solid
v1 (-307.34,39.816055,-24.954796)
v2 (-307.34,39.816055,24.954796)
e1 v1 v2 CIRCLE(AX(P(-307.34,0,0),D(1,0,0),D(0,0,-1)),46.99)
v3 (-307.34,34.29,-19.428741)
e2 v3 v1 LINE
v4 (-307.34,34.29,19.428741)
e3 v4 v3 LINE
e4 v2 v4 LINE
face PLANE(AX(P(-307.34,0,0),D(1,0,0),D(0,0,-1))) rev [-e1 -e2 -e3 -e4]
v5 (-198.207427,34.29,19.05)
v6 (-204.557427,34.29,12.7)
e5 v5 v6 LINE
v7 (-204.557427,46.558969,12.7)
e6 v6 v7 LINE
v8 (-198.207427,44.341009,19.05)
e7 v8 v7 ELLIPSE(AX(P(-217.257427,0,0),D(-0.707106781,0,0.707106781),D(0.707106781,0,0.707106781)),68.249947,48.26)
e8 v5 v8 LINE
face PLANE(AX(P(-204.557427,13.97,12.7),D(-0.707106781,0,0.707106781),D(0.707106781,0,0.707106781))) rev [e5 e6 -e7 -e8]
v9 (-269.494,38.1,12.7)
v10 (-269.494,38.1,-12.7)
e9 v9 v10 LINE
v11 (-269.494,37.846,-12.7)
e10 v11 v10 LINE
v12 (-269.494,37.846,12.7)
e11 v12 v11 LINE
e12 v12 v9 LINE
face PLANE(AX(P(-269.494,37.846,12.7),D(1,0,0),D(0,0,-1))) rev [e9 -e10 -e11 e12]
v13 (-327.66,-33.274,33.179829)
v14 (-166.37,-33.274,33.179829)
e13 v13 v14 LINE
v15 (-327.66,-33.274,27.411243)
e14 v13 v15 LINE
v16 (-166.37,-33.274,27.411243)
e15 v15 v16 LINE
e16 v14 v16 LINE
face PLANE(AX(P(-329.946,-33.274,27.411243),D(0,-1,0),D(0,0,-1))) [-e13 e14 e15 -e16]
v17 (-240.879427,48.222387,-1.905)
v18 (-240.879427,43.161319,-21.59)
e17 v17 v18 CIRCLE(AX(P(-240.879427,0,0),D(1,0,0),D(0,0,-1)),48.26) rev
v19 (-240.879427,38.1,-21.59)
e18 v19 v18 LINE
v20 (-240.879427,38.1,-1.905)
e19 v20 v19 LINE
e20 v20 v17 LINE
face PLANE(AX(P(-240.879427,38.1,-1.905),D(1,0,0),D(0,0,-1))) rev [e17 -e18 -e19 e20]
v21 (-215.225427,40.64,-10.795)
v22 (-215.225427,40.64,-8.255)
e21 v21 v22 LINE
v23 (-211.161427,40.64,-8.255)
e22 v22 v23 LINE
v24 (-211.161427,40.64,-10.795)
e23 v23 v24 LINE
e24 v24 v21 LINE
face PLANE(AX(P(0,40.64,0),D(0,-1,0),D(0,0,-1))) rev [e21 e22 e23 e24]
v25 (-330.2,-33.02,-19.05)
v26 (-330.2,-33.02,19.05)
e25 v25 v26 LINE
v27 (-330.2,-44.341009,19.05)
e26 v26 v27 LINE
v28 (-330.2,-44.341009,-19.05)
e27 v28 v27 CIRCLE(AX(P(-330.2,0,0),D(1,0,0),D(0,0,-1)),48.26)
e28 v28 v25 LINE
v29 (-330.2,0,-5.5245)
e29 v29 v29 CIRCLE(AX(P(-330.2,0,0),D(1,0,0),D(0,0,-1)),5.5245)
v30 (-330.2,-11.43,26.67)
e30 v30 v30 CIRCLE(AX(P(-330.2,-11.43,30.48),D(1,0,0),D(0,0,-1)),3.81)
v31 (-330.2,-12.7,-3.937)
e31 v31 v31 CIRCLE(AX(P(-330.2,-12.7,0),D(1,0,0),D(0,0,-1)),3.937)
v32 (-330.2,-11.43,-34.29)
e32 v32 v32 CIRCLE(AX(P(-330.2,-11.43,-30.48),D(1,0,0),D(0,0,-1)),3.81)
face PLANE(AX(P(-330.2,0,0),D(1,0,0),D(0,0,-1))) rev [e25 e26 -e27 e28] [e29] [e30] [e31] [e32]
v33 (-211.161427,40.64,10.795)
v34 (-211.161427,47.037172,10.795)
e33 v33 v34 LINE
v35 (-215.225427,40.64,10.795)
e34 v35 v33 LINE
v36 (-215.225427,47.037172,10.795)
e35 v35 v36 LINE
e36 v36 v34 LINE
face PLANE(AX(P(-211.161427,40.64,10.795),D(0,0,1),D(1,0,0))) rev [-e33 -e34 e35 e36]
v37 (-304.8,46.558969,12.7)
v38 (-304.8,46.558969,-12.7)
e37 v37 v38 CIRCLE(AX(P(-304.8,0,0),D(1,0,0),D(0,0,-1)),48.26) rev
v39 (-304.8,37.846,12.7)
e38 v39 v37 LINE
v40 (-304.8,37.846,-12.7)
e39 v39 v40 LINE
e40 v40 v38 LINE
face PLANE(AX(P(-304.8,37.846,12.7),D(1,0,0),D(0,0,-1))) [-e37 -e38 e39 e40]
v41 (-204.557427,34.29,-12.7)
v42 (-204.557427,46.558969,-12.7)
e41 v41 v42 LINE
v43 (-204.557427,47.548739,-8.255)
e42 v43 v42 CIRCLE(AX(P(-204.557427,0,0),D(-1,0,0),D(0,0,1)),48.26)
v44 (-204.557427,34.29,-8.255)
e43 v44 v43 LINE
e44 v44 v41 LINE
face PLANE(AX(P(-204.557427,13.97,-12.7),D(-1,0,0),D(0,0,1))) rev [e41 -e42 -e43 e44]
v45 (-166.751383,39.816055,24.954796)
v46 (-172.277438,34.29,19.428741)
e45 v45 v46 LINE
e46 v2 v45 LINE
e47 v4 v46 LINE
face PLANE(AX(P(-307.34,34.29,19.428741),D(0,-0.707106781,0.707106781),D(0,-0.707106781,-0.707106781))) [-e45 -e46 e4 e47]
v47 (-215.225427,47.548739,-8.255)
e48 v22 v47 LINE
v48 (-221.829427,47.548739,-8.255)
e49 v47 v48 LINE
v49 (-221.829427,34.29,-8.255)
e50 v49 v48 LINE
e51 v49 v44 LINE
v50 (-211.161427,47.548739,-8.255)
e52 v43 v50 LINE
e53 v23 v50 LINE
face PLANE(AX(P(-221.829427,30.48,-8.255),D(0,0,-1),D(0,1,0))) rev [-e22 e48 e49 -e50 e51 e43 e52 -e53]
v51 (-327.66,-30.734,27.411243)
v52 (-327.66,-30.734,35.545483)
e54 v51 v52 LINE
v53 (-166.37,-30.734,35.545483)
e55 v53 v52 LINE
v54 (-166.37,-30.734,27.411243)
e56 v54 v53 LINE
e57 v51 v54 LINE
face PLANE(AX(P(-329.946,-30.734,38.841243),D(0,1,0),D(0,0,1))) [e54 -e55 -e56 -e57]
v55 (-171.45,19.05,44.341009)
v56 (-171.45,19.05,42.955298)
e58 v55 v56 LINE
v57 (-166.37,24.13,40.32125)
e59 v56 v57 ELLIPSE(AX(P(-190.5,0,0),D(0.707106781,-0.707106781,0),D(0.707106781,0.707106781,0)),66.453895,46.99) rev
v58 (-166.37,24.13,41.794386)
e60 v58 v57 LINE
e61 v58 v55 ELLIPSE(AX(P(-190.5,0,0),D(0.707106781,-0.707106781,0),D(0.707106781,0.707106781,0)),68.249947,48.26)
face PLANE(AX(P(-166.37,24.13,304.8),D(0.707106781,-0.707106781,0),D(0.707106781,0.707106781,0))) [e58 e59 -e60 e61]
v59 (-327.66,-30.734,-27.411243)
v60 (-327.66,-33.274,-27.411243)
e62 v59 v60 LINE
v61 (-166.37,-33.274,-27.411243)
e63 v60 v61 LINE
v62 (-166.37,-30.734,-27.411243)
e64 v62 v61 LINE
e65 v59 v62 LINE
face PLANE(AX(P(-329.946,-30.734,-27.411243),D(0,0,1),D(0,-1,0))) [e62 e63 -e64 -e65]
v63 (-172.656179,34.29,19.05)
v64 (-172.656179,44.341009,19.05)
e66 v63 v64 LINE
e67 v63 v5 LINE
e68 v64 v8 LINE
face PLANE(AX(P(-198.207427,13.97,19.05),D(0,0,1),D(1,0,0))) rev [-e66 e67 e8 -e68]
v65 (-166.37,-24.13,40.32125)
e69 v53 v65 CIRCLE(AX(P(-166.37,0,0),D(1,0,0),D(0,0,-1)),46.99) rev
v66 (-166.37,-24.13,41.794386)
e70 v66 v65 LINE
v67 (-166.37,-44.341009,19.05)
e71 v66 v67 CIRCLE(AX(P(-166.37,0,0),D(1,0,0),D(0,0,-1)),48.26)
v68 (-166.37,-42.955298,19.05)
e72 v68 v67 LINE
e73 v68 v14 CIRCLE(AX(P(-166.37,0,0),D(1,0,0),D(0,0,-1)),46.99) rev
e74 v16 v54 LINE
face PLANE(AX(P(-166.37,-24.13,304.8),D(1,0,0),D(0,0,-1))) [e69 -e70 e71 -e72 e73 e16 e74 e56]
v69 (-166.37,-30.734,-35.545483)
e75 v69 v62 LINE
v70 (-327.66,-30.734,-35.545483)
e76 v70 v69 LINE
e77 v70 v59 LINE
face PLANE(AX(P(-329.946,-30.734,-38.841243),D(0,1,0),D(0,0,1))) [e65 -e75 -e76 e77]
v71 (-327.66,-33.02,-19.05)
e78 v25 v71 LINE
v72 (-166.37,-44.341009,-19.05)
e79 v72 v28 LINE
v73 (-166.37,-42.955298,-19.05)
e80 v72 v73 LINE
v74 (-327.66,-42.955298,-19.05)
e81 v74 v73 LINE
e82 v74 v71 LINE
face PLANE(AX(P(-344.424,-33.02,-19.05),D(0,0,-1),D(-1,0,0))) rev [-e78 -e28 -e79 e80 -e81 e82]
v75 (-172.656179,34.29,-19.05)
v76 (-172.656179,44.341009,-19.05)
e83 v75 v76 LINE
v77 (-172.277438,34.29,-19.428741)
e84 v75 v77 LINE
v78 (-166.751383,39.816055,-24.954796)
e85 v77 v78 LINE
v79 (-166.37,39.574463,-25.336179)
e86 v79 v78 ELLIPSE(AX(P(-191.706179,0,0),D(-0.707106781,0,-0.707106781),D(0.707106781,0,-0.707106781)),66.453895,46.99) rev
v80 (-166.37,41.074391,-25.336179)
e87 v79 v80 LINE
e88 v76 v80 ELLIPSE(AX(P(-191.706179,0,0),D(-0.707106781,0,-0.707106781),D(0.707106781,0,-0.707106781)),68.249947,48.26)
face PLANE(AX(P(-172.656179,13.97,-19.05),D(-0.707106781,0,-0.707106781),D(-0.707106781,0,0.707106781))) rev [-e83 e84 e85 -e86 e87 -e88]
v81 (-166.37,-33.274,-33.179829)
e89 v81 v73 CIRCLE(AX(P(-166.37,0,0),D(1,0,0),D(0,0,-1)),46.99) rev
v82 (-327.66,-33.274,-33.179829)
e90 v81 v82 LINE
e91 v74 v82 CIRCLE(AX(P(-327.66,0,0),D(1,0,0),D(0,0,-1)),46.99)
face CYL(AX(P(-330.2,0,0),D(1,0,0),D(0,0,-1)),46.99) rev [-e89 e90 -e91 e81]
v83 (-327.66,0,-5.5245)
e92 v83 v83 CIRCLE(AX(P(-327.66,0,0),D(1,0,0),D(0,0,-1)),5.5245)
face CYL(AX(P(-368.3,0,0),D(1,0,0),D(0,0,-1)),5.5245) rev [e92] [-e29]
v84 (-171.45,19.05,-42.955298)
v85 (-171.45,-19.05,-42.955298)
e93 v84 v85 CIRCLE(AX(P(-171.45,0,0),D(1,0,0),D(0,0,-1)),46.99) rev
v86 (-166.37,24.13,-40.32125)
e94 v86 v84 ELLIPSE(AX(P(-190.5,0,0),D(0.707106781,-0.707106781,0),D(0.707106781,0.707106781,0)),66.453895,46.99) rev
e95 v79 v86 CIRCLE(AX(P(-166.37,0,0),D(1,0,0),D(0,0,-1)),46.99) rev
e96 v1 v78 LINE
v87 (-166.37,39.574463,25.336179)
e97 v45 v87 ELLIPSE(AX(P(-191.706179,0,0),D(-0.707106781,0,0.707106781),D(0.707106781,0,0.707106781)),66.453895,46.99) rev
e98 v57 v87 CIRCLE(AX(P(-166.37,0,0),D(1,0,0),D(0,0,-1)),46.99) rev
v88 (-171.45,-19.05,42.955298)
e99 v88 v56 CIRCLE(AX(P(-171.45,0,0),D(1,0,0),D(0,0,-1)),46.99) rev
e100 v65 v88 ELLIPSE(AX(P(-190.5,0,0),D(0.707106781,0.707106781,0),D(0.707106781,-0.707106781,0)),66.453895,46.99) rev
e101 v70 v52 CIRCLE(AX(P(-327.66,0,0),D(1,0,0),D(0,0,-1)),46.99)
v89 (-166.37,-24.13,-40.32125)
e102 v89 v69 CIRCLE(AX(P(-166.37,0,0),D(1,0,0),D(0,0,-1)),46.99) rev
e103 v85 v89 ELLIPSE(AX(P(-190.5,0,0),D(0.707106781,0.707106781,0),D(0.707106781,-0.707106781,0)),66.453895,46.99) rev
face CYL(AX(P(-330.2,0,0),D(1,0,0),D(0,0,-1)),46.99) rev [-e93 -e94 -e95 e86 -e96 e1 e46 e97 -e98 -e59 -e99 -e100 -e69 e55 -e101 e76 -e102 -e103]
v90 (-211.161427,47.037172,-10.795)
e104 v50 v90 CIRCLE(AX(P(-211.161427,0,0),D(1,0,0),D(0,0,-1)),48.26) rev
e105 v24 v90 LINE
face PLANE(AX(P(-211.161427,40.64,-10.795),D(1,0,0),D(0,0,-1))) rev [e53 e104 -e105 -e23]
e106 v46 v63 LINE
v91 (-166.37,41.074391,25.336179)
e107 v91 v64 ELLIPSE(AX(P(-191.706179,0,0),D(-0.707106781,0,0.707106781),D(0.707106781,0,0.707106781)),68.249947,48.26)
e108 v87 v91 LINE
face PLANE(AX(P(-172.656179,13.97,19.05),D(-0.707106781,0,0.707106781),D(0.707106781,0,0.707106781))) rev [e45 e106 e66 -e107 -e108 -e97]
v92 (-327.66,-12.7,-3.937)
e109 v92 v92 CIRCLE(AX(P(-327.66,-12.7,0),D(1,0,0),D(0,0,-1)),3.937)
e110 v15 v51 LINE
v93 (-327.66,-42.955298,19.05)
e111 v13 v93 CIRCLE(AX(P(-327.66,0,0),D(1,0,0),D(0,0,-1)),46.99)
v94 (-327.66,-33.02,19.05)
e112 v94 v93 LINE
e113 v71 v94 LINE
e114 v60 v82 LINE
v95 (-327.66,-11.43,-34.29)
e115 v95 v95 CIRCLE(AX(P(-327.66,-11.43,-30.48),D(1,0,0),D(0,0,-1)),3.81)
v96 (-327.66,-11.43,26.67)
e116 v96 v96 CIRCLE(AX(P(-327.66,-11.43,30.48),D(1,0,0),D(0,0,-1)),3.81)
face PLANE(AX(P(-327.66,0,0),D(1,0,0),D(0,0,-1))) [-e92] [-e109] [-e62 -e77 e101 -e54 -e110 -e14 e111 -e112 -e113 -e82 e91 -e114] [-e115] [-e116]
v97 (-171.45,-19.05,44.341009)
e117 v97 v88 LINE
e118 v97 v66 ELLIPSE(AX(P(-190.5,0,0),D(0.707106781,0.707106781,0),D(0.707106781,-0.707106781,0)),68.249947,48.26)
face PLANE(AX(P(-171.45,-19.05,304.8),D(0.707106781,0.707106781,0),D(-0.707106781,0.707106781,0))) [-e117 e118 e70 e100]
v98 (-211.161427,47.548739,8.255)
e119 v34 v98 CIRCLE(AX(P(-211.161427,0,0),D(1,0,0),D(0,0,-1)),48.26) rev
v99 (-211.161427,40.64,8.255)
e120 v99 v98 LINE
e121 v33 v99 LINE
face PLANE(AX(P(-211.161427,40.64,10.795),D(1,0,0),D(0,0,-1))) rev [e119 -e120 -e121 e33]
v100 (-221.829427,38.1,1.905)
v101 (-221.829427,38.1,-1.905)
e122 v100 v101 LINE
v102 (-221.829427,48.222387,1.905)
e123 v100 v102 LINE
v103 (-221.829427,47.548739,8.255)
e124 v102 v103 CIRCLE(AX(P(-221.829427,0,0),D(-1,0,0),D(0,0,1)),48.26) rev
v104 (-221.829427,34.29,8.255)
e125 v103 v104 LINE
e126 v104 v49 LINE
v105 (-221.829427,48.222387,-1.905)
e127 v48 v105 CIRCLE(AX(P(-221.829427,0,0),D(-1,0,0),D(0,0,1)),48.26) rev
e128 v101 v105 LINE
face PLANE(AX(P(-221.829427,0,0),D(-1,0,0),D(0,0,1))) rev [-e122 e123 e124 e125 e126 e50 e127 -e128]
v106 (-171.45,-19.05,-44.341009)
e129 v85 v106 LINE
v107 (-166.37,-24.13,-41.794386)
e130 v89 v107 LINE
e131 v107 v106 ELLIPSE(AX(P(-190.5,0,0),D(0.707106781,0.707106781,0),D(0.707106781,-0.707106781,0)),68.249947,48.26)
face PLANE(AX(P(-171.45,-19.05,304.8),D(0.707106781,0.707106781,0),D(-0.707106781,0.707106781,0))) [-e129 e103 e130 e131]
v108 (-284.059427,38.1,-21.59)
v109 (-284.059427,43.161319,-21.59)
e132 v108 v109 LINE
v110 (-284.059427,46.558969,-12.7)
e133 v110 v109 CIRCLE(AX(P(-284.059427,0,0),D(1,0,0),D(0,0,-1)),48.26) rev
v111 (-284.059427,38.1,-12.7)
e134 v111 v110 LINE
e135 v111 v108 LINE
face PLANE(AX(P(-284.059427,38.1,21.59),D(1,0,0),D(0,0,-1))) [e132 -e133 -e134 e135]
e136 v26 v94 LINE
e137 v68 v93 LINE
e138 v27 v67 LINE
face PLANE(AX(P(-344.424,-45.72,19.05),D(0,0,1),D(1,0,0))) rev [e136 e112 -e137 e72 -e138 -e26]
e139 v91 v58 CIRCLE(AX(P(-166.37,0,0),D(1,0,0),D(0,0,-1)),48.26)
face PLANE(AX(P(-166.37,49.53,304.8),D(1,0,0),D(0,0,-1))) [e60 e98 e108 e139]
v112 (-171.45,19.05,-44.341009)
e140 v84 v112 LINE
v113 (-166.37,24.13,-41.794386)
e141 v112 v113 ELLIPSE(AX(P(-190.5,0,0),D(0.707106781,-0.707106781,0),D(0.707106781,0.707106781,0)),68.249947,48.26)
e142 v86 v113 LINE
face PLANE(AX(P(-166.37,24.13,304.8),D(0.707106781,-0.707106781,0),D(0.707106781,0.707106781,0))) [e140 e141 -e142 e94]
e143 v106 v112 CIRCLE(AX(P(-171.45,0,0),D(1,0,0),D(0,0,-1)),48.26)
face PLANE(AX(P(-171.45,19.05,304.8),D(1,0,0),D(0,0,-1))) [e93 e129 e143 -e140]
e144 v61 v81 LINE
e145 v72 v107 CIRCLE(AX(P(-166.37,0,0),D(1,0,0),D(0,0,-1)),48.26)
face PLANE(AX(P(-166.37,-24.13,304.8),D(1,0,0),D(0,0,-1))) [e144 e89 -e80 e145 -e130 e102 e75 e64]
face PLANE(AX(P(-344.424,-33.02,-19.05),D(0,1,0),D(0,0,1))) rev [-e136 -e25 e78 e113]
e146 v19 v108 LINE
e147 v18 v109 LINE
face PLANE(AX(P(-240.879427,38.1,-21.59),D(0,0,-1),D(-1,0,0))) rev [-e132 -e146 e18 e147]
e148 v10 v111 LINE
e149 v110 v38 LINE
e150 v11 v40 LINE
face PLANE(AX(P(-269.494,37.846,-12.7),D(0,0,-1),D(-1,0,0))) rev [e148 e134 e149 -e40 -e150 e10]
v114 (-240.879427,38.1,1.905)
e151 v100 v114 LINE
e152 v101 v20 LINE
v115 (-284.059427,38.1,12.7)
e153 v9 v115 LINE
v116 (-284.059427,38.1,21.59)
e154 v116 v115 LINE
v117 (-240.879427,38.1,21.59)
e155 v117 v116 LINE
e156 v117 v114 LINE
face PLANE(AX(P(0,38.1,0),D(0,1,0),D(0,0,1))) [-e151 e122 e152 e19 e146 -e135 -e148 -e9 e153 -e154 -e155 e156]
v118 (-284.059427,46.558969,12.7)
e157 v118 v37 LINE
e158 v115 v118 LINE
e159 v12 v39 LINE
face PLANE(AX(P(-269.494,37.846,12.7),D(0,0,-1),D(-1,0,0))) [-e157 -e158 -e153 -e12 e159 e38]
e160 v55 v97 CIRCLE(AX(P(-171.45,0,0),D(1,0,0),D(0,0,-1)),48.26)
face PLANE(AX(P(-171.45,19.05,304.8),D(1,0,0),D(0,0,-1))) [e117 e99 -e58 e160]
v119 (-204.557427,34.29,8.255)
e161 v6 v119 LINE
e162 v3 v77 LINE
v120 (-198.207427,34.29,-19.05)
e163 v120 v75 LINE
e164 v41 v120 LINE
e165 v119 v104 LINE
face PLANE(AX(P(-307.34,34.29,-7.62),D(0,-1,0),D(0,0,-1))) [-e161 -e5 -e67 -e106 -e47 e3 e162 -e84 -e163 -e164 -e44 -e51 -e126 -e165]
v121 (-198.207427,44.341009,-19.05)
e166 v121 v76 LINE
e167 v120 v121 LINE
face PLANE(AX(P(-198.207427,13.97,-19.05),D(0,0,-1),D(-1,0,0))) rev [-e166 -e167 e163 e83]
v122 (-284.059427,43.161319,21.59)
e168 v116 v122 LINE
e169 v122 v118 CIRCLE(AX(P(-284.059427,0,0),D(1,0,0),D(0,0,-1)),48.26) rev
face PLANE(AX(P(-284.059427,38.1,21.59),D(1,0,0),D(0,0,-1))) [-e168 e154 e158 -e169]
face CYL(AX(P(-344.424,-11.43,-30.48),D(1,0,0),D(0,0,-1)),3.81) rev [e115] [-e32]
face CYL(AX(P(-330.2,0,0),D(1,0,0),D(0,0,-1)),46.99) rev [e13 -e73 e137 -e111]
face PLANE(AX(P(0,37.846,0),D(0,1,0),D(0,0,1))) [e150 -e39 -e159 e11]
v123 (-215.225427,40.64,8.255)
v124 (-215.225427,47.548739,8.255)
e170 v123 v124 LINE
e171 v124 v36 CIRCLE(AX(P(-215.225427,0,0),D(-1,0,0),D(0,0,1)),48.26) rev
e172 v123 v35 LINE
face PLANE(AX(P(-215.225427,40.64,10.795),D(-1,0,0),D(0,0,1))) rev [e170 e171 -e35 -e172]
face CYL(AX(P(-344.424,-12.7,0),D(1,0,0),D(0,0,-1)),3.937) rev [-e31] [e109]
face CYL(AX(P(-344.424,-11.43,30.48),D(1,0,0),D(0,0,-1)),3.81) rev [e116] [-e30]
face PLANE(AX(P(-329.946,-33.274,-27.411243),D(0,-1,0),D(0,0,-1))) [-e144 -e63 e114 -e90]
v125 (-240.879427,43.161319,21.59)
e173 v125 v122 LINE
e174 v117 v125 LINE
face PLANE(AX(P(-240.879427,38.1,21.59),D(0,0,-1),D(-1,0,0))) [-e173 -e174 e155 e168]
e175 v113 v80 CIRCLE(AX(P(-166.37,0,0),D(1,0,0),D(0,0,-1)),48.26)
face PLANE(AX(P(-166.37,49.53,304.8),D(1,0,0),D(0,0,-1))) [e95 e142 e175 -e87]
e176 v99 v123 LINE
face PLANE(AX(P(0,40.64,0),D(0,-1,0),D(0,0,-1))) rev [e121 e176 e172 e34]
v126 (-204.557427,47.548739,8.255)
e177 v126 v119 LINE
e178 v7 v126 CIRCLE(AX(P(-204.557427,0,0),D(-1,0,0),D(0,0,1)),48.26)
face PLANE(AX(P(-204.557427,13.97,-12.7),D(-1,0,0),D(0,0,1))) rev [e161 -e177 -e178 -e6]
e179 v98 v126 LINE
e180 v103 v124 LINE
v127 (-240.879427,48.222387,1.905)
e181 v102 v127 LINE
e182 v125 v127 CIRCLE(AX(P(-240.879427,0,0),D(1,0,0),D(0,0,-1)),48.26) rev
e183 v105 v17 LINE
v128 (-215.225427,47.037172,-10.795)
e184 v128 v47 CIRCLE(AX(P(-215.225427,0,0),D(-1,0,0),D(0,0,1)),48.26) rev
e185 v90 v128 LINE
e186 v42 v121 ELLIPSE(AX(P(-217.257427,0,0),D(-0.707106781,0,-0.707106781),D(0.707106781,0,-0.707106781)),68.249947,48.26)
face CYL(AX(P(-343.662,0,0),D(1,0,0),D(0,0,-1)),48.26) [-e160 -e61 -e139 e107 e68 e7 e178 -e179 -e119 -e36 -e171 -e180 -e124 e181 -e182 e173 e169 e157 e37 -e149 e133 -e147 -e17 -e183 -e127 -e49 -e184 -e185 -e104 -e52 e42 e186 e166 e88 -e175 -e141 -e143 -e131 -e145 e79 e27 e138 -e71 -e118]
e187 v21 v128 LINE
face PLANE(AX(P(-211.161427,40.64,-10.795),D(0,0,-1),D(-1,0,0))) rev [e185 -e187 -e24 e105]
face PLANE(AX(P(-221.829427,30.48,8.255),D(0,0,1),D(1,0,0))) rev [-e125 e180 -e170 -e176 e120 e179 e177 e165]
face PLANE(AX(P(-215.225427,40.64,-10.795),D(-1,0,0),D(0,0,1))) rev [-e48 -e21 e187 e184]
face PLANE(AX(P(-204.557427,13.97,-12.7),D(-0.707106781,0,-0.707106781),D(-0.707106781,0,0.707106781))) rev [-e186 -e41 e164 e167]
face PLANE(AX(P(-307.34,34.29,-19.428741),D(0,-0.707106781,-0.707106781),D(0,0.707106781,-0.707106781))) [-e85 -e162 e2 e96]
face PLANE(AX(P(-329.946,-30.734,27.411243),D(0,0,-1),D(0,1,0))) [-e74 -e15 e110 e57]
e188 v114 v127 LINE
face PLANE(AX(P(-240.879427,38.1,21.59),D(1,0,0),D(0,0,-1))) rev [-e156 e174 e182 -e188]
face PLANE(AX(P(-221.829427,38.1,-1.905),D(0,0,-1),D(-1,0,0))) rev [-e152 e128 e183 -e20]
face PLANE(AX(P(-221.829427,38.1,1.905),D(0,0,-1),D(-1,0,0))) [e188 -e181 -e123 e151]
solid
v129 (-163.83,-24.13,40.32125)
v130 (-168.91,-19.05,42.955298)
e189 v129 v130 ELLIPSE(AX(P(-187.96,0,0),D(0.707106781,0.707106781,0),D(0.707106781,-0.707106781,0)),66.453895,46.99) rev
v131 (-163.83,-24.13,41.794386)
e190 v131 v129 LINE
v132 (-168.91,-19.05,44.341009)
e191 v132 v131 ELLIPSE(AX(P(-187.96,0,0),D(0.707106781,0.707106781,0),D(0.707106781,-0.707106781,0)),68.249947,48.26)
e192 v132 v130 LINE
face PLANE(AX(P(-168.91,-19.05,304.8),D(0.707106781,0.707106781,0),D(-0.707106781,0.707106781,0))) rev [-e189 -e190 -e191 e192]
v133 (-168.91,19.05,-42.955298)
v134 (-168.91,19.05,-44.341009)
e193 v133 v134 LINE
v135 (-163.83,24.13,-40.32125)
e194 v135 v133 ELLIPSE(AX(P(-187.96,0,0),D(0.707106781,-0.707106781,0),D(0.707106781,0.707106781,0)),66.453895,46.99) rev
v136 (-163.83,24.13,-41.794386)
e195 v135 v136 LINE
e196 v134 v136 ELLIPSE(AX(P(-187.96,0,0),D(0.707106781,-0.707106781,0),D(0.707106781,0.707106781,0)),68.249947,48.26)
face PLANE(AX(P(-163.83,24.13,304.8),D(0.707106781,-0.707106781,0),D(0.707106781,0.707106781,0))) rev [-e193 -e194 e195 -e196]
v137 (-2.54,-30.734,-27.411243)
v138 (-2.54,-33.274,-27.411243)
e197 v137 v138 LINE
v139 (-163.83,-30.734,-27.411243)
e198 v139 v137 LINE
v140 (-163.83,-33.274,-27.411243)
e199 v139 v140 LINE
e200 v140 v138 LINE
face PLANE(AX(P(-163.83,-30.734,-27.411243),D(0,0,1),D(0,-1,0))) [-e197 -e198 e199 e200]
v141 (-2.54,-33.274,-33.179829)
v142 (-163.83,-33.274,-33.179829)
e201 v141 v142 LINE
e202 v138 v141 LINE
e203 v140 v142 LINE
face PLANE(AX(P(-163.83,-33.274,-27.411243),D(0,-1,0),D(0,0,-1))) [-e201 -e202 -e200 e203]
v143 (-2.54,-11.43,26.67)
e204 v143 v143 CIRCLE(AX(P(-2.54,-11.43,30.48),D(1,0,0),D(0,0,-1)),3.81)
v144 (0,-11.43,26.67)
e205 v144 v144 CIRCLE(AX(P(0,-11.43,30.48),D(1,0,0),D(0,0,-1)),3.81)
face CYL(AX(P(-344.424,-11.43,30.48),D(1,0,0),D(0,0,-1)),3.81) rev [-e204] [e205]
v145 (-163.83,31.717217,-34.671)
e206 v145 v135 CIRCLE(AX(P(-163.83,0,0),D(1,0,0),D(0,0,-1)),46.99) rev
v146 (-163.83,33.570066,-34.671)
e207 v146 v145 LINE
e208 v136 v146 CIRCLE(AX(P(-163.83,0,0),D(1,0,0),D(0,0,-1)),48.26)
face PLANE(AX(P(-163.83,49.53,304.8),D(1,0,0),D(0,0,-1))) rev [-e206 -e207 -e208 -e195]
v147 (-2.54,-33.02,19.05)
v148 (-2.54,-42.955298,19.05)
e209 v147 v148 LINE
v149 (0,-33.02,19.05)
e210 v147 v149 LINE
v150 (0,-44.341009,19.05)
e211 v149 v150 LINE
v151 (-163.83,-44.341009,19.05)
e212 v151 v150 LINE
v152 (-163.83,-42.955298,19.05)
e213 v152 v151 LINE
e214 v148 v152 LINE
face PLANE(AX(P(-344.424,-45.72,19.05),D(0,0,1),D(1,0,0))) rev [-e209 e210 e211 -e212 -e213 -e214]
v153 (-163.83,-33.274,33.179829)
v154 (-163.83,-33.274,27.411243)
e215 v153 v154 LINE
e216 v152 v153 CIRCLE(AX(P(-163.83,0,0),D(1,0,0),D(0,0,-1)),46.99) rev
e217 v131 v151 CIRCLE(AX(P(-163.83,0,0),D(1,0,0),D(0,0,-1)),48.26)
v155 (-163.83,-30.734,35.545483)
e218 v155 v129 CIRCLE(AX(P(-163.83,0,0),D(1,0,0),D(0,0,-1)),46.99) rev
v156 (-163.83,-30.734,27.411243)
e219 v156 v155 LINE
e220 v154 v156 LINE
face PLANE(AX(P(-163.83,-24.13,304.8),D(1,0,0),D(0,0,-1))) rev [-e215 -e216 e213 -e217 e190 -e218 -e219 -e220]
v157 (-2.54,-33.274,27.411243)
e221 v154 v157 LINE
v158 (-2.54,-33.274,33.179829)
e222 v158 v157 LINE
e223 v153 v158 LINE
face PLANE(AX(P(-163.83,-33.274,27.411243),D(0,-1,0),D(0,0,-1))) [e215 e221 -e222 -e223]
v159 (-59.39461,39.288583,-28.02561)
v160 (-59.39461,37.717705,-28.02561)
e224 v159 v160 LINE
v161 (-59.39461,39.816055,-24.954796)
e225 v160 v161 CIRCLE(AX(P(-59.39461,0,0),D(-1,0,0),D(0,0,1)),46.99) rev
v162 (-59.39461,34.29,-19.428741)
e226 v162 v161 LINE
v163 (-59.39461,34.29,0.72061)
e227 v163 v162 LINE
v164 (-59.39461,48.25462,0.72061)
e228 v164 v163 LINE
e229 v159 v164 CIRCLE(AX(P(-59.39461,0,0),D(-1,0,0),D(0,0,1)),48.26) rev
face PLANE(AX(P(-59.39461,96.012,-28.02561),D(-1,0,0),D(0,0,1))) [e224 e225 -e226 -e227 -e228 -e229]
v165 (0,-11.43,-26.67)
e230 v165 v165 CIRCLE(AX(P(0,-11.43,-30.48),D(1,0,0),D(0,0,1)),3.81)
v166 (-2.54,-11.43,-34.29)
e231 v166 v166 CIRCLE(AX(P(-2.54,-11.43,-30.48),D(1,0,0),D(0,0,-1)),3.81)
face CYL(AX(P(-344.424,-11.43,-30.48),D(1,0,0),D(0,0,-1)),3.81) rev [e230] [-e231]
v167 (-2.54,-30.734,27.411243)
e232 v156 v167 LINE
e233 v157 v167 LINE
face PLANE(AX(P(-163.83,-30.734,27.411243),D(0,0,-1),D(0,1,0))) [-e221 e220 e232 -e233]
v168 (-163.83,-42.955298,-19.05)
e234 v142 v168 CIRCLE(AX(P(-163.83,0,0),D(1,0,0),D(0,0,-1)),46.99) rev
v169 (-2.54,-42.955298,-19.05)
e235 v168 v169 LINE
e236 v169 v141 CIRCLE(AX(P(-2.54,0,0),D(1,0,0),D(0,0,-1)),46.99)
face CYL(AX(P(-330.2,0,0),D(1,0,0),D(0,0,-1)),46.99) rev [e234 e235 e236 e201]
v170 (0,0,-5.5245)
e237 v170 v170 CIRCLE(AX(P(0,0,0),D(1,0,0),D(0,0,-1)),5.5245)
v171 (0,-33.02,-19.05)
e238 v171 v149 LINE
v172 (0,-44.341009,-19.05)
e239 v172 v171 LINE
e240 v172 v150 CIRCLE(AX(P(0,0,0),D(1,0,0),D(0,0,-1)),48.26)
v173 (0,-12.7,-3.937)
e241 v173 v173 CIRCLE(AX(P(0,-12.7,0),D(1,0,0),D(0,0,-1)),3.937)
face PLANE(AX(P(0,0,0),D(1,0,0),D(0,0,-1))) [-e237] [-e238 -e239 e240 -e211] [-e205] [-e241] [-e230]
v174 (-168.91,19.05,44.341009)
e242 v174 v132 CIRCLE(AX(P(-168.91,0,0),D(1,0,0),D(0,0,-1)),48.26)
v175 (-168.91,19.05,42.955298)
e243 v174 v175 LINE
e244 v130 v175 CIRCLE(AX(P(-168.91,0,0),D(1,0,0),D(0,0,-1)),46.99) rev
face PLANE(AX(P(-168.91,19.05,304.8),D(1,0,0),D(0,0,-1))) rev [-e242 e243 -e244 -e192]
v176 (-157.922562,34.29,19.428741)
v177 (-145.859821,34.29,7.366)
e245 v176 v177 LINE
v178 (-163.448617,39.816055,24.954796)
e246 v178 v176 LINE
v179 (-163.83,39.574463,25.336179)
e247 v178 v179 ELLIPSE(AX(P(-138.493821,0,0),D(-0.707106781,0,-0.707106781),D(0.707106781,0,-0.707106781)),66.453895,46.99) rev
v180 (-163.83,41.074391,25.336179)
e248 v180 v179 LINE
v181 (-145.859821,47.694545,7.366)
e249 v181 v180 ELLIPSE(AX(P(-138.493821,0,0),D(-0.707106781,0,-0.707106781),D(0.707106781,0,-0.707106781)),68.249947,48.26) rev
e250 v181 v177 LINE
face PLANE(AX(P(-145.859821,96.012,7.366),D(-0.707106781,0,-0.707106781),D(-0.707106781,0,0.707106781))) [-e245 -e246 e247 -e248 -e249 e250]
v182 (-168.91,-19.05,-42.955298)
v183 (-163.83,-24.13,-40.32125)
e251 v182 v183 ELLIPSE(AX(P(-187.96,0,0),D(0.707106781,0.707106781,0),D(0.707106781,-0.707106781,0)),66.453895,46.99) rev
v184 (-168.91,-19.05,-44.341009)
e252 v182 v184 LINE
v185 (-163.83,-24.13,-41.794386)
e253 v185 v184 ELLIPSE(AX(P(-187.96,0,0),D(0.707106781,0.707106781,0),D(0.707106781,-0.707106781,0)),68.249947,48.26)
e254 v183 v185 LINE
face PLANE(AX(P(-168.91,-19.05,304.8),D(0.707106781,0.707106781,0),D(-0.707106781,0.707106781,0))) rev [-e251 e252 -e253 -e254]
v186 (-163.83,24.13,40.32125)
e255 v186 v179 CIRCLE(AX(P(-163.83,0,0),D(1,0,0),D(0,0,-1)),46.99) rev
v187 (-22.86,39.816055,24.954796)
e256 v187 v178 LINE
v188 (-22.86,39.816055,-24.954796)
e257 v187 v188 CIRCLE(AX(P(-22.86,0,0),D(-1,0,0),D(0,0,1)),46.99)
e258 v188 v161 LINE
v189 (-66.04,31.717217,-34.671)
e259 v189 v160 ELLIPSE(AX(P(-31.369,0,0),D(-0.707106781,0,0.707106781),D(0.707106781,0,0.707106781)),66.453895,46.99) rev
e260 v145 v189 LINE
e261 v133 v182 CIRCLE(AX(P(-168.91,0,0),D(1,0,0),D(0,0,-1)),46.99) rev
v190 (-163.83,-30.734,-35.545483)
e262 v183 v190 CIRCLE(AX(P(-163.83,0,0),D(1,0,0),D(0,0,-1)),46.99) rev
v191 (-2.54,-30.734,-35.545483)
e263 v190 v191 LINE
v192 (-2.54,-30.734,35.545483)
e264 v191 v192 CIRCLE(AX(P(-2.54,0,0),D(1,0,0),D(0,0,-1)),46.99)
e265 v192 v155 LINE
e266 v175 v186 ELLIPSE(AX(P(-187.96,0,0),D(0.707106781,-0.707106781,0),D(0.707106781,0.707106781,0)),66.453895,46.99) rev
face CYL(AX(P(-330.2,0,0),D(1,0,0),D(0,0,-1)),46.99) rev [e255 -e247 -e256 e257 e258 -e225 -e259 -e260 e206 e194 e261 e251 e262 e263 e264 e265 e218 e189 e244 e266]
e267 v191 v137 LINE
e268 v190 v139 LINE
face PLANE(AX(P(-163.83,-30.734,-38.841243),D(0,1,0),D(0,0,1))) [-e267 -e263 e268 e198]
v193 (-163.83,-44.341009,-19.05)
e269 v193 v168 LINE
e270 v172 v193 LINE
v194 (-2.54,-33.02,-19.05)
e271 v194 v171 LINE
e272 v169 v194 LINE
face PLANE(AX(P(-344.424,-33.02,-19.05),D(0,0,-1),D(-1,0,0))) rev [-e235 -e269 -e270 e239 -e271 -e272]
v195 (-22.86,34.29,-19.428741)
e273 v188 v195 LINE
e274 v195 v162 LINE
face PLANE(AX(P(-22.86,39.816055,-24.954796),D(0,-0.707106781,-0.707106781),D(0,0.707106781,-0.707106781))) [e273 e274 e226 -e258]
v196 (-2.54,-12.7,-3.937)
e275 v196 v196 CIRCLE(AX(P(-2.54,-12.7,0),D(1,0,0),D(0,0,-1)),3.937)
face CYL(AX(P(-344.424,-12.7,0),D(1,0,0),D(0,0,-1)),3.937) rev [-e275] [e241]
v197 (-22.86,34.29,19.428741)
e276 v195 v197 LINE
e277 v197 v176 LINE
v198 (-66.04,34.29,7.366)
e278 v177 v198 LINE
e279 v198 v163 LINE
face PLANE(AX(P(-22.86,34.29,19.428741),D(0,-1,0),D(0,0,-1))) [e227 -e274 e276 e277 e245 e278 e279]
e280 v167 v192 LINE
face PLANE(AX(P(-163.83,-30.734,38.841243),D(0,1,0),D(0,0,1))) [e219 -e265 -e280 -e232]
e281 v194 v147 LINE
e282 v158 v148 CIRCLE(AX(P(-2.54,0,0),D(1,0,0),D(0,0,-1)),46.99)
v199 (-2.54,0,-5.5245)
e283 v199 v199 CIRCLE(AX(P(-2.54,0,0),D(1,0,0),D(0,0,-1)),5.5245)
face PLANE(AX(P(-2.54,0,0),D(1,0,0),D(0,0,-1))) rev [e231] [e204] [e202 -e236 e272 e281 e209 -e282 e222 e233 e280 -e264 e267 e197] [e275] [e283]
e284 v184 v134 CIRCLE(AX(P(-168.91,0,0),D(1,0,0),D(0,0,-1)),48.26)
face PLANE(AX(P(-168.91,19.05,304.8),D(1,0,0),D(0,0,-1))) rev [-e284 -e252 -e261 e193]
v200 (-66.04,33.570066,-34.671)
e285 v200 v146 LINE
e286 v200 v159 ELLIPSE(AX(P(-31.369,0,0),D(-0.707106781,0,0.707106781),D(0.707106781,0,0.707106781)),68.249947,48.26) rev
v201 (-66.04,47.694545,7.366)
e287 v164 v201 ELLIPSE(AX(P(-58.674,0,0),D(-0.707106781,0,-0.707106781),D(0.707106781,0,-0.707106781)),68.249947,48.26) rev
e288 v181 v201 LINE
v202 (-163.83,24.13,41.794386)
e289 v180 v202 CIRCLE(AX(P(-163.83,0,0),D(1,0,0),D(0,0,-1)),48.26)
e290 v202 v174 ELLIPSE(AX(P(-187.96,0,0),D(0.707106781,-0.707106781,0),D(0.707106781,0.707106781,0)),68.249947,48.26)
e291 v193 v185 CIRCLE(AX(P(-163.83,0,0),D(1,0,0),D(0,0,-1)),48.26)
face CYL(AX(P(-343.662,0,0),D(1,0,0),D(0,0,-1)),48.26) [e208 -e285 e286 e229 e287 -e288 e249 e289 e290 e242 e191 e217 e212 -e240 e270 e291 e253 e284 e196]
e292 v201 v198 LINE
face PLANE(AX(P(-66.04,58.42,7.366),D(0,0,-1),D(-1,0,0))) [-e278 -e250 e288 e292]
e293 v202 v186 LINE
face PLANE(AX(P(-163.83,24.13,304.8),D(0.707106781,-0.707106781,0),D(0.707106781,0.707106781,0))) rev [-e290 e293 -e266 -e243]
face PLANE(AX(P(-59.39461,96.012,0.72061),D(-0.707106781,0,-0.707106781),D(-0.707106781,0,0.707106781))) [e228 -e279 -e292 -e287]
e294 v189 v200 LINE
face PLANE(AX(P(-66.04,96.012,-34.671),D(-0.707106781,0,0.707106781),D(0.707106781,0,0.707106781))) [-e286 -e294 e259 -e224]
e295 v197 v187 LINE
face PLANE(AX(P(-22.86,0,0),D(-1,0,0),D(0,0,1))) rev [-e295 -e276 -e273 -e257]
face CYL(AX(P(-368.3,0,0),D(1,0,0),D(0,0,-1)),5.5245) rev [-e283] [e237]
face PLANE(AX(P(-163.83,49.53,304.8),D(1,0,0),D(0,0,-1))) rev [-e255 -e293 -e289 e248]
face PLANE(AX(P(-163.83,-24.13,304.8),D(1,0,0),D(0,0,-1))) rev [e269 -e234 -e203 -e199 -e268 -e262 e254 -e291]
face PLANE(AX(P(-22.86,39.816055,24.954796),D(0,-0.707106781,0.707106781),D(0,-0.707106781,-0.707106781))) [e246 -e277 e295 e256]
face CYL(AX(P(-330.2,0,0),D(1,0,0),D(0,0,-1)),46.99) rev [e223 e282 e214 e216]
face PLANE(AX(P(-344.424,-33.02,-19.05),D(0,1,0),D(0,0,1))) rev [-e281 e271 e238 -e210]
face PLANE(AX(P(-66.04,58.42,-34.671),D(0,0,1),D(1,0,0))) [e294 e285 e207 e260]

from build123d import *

# Parameters (mm, degrees)
SKETCH1_R                   = 49.53
CAN_BODY_DEPTH              = 330.2
SEPARATION_DEPTH            = 304.8
SEPARATION_DEPTH_BACK       = 304.8
SHELL1_START                = -327.66
SHELL1_OUTLINE_R            = 46.99
SHELL1_DEPTH                = 161.29
SHELL2_START                = -168.91
SHELL2_OUTLINE_R            = 46.99
SHELL2_DEPTH                = 166.37
SKETCH3_R                   = 3.81
SKETCH3_R_2                 = 3.937
CORD_AND_ROD_CUTS_DEPTH     = 344.424
BOTTOM_RETENTION_RAIL_DEPTH = 140.97
POWER_SWITCH_SLOT_DEPTH     = 35.56
TOP_RETENTION_RIDGE_DEPTH   = 140.97
SKETCH9_R                   = 5.5245
CENTER_HOLE_DEPTH           = 368.3
TOP_GUIDE_RAIL_DEPTH        = 163.83
BOTTOM_START                = -166.37
BOTTOM_GUIDE_RAIL_DEPTH     = 163.576
GOPRO_SLOT_DEPTH            = 2.54
GOPRO_SLOT_DEPTH_BACK       = 96.012
GOPRO_SLOT_START            = -68.58
SKETCH14_W                  = 42.037
SKETCH14_H                  = 58.42
SKETCH13_W                  = 132.445406608
SKETCH13_H                  = 121.677106584
SKETCH13_R                  = 48.26
TOLERANCE_ADJUST_DEPTH      = 343.662
GOPRO_SLOT_CORNERS_DEPTH    = 96.012
SKETCH18_W                  = 16.51
SKETCH18_H                  = 25.4
RUNCAM_CAMERA_CUTOUT_DEPTH  = 17.272
SKETCH19_W                  = 4.064
SKETCH19_H                  = 2.54
CUT_EXTRUDE1_DEPTH          = 7.62
CUT_EXTRUDE2_DEPTH          = 10.16
SKETCH21_W                  = 35.306
SKETCH21_H                  = 25.4
CUT_EXTRUDE3_DEPTH          = 10.414


# Read off the part's stored shape, not the designer's step: Shell1, Shell2
with BuildPart() as part:
    # Sketch1 → Can Body (new body)
    with BuildSketch(Plane(origin=(0, 0, 0), x_dir=(0, 0, -1), z_dir=(1, 0, 0))):
        Circle(SKETCH1_R)
    extrude(amount=-CAN_BODY_DEPTH)

    # Sketch2 → Separation (cut, two sides: drawn at the far end of the back side and taken through both)
    with BuildSketch(Plane.XY.offset(-SEPARATION_DEPTH_BACK)):
        Polygon((-168.91, 19.05), (-168.91, -19.05), (-163.83, -24.13), (-163.83, -49.53), (-166.37, -49.53), (-166.37, -24.13), (-171.45, -19.05), (-171.45, 19.05), (-166.37, 24.13), (-166.37, 49.53), (-163.83, 49.53), (-163.83, 24.13), align=None)
    extrude(amount=SEPARATION_DEPTH + SEPARATION_DEPTH_BACK, mode=Mode.SUBTRACT)


with BuildPart() as separation_piece_1:
    # of the separate pieces the step leaves, piece 1, a body of its own (separation_pieces)
    add(part.part.solids().sort_by_distance((0, 0, -49.53))[0])

    # Shell2 outline → Shell2 (cut)
    with BuildSketch(Plane.YZ.offset(SHELL2_START)):
        Circle(SHELL2_OUTLINE_R)
    extrude(amount=SHELL2_DEPTH, mode=Mode.SUBTRACT)


with BuildPart() as separation_piece_2:
    # of the separate pieces the step leaves, piece 2, a body of its own (separation_pieces)
    add(part.part.solids().sort_by_distance((-171.45, 0, -49.53))[0])

    # Shell1 outline → Shell1 (cut)
    with BuildSketch(Plane.YZ.offset(SHELL1_START)):
        Circle(SHELL1_OUTLINE_R)
    extrude(amount=SHELL1_DEPTH, mode=Mode.SUBTRACT)


with BuildPart() as cord_and_rod_cuts_tool:
    # Sketch3 → Cord and rod cuts (new body)
    with BuildSketch(Plane(origin=(0, 0, 0), x_dir=(0, 0, -1), z_dir=(1, 0, 0))):
        with Locations((-30.48, -11.43)):
            Circle(SKETCH3_R)
        with Locations((30.48, -11.43)):
            Circle(SKETCH3_R)
        with Locations((0, -12.7)):
            Circle(SKETCH3_R_2)
        Polygon((19.05, -33.02), (-19.05, -33.02), (-19.05, -45.72), (-19.05, -57.214809543), (19.05, -57.214809543), (19.05, -45.72), align=None)
    extrude(amount=-CORD_AND_ROD_CUTS_DEPTH)


with BuildPart() as separation_piece_1_1:
    add(separation_piece_1.part)

    # Cord and rod cuts: cut by cord_and_rod_cuts_tool
    add(cord_and_rod_cuts_tool.part, mode=Mode.SUBTRACT)

    # Sketch7 → Top Retention Ridge (add)
    with BuildSketch(Plane.ZY.offset(163.83)):
        with BuildLine():
            Line((19.428741027, 34.29), (-19.428741027, 34.29))
            Line((-19.428741027, 34.29), (-24.954796178, 39.81605515))
            ThreePointArc((-24.954796178, 39.81605515), (0, 46.99), (24.954796178, 39.81605515))
            Line((24.954796178, 39.81605515), (19.428741027, 34.29))
        make_face()
    extrude(amount=-TOP_RETENTION_RIDGE_DEPTH)


with BuildPart() as separation_piece_2_1:
    add(separation_piece_2.part)

    # Cord and rod cuts: cut by cord_and_rod_cuts_tool
    add(cord_and_rod_cuts_tool.part, mode=Mode.SUBTRACT)

    # Sketch4 → Bottom Retention Rail (add)
    with BuildSketch(Plane(origin=(-166.37, 0, 0), x_dir=(0, 0, -1), z_dir=(1, 0, 0))):
        with BuildLine():
            Line((-7.62, 34.29), (-19.428741027, 34.29))
            Line((-19.428741027, 34.29), (-24.954796178, 39.81605515))
            ThreePointArc((-24.954796178, 39.81605515), (0, 46.99), (24.954796178, 39.81605515))
            Line((24.954796178, 39.81605515), (19.428741027, 34.29))
            Line((19.428741027, 34.29), (7.62, 34.29))
            Line((7.62, 34.29), (-7.62, 34.29))
        make_face()
    extrude(amount=-BOTTOM_RETENTION_RAIL_DEPTH)

    # Sketch5 → Power Switch Slot (cut)
    with BuildSketch(Plane(origin=(0, 49.53, 0), x_dir=(1, 0, 0), z_dir=(0, 1, 0))):
        Polygon((-204.557426539, 12.7), (-204.557426539, -12.7), (-198.207426539, -19.05), (-172.656179285, -19.05), (-166.37, -25.336179285), (-166.37, 25.336179285), (-172.656179285, 19.05), (-198.207426539, 19.05), align=None)
    extrude(amount=-POWER_SWITCH_SLOT_DEPTH, mode=Mode.SUBTRACT)


with BuildPart() as center_hole_tool:
    # Sketch9 → Center Hole (new body)
    with BuildSketch(Plane(origin=(0, 0, 0), x_dir=(0, 0, -1), z_dir=(1, 0, 0))):
        Circle(SKETCH9_R)
    extrude(amount=-CENTER_HOLE_DEPTH)


with BuildPart() as separation_piece_1_2:
    add(separation_piece_1_1.part)

    # Center Hole: cut by center_hole_tool
    add(center_hole_tool.part, mode=Mode.SUBTRACT)

    # Sketch10 → Top Guide Rail (add)
    with BuildSketch(Plane(origin=(0, 0, 0), x_dir=(0, 0, -1), z_dir=(1, 0, 0))):
        Polygon((-38.841242823, -30.734), (-27.411242823, -30.734), (-27.411242823, -33.274), (-36.688715213, -33.274), (-37.233551179, -31.620508339), align=None)
        Polygon((37.233551179, -31.620508339), (38.841242823, -30.734), (27.411242823, -30.734), (27.411242823, -33.274), (36.688715213, -33.274), align=None)
    extrude(amount=-TOP_GUIDE_RAIL_DEPTH)

    # Sketch14 → GoPro Slot (cut, two sides: drawn at the far end of the back side and taken through both)
    with BuildSketch(Plane(origin=(0, 0, 0), x_dir=(0, 0, -1), z_dir=(1, 0, 0)).offset(GOPRO_SLOT_START - GOPRO_SLOT_DEPTH_BACK)):
        with Locations((13.6525, 29.21)):
            Rectangle(SKETCH14_W, SKETCH14_H)
    extrude(amount=GOPRO_SLOT_DEPTH + GOPRO_SLOT_DEPTH_BACK, mode=Mode.SUBTRACT)


with BuildPart() as separation_piece_2_2:
    add(separation_piece_2_1.part)

    # Center Hole: cut by center_hole_tool
    add(center_hole_tool.part, mode=Mode.SUBTRACT)

    # Sketch10<2> → Bottom Guide Rail (add)
    with BuildSketch(Plane(origin=(0, 0, 0), x_dir=(0, 0, -1), z_dir=(1, 0, 0)).offset(BOTTOM_START)):
        Polygon((-38.841242823, -30.734), (-27.411242823, -30.734), (-27.411242823, -33.274), (-36.688715213, -33.274), (-37.233551179, -31.620508339), align=None)
        Polygon((37.233551179, -31.620508339), (38.841242823, -30.734), (27.411242823, -30.734), (27.411242823, -33.274), (36.688715213, -33.274), align=None)
    extrude(amount=-BOTTOM_GUIDE_RAIL_DEPTH)


with BuildPart() as tolerance_adjust_tool:
    # Sketch13 → Tolerance Adjust (new body)
    with BuildSketch(Plane(origin=(0, 0, 0), x_dir=(0, 0, -1), z_dir=(1, 0, 0))):
        Rectangle(SKETCH13_W, SKETCH13_H)
        Circle(SKETCH13_R, mode=Mode.SUBTRACT)
    extrude(amount=-TOLERANCE_ADJUST_DEPTH)


with BuildPart() as separation_piece_1_3:
    add(separation_piece_1_2.part)

    # Tolerance Adjust: cut by tolerance_adjust_tool
    add(tolerance_adjust_tool.part, mode=Mode.SUBTRACT)

    # Sketch15 → GoPro Slot Corners (cut)
    with BuildSketch(Plane(origin=(0, 0, 0), x_dir=(1, 0, 0), z_dir=(0, 1, 0))):
        Polygon((-66.04, 34.671), (-59.39461047, 28.02561047), (-59.39461047, -0.72061047), (-66.04, -7.366), align=None)
        Polygon((-163.83, 34.671), (-145.859820715, 34.671), (-145.859820715, -7.366), (-163.83, -25.336179285), align=None)
    extrude(amount=GOPRO_SLOT_CORNERS_DEPTH, mode=Mode.SUBTRACT)


with BuildPart() as separation_piece_2_3:
    add(separation_piece_2_2.part)

    # Tolerance Adjust: cut by tolerance_adjust_tool
    add(tolerance_adjust_tool.part, mode=Mode.SUBTRACT)

    # Sketch18 → Runcam Camera Cutout (cut)
    with BuildSketch(Plane(origin=(-204.557426539, 0, 0), x_dir=(0, 0, -1), z_dir=(1, 0, 0))):
        with Locations((0, 43.18)):
            Rectangle(SKETCH18_W, SKETCH18_H)
    extrude(amount=-RUNCAM_CAMERA_CUTOUT_DEPTH, mode=Mode.SUBTRACT)

    # Sketch19 → Cut-Extrude1 (cut)
    with BuildSketch(Plane(origin=(0, 48.26, 0), x_dir=(1, 0, 0), z_dir=(0, 1, 0))):
        with Locations((-213.193426539, 9.525)):
            Rectangle(SKETCH19_W, SKETCH19_H)
        with Locations((-213.193426539, -9.525)):
            Rectangle(SKETCH19_W, SKETCH19_H)
    extrude(amount=-CUT_EXTRUDE1_DEPTH, mode=Mode.SUBTRACT)

    # Sketch20 → Cut-Extrude2 (cut)
    with BuildSketch(Plane(origin=(0, 48.26, 0), x_dir=(1, 0, 0), z_dir=(0, 1, 0))):
        Polygon((-240.879426539, 1.905), (-240.879426539, 21.59), (-284.059426539, 21.59), (-284.059426539, -21.59), (-240.879426539, -21.59), (-240.879426539, -1.905), (-221.829426539, -1.905), (-221.829426539, 1.905), align=None)
    extrude(amount=-CUT_EXTRUDE2_DEPTH, mode=Mode.SUBTRACT)

    # Sketch21 → Cut-Extrude3 (cut)
    with BuildSketch(Plane(origin=(0, 48.26, 0), x_dir=(1, 0, 0), z_dir=(0, 1, 0))):
        with Locations((-287.147, 0)):
            Rectangle(SKETCH21_W, SKETCH21_H)
    extrude(amount=-CUT_EXTRUDE3_DEPTH, mode=Mode.SUBTRACT)


solid = Compound([separation_piece_1_3.part, separation_piece_2_3.part])
